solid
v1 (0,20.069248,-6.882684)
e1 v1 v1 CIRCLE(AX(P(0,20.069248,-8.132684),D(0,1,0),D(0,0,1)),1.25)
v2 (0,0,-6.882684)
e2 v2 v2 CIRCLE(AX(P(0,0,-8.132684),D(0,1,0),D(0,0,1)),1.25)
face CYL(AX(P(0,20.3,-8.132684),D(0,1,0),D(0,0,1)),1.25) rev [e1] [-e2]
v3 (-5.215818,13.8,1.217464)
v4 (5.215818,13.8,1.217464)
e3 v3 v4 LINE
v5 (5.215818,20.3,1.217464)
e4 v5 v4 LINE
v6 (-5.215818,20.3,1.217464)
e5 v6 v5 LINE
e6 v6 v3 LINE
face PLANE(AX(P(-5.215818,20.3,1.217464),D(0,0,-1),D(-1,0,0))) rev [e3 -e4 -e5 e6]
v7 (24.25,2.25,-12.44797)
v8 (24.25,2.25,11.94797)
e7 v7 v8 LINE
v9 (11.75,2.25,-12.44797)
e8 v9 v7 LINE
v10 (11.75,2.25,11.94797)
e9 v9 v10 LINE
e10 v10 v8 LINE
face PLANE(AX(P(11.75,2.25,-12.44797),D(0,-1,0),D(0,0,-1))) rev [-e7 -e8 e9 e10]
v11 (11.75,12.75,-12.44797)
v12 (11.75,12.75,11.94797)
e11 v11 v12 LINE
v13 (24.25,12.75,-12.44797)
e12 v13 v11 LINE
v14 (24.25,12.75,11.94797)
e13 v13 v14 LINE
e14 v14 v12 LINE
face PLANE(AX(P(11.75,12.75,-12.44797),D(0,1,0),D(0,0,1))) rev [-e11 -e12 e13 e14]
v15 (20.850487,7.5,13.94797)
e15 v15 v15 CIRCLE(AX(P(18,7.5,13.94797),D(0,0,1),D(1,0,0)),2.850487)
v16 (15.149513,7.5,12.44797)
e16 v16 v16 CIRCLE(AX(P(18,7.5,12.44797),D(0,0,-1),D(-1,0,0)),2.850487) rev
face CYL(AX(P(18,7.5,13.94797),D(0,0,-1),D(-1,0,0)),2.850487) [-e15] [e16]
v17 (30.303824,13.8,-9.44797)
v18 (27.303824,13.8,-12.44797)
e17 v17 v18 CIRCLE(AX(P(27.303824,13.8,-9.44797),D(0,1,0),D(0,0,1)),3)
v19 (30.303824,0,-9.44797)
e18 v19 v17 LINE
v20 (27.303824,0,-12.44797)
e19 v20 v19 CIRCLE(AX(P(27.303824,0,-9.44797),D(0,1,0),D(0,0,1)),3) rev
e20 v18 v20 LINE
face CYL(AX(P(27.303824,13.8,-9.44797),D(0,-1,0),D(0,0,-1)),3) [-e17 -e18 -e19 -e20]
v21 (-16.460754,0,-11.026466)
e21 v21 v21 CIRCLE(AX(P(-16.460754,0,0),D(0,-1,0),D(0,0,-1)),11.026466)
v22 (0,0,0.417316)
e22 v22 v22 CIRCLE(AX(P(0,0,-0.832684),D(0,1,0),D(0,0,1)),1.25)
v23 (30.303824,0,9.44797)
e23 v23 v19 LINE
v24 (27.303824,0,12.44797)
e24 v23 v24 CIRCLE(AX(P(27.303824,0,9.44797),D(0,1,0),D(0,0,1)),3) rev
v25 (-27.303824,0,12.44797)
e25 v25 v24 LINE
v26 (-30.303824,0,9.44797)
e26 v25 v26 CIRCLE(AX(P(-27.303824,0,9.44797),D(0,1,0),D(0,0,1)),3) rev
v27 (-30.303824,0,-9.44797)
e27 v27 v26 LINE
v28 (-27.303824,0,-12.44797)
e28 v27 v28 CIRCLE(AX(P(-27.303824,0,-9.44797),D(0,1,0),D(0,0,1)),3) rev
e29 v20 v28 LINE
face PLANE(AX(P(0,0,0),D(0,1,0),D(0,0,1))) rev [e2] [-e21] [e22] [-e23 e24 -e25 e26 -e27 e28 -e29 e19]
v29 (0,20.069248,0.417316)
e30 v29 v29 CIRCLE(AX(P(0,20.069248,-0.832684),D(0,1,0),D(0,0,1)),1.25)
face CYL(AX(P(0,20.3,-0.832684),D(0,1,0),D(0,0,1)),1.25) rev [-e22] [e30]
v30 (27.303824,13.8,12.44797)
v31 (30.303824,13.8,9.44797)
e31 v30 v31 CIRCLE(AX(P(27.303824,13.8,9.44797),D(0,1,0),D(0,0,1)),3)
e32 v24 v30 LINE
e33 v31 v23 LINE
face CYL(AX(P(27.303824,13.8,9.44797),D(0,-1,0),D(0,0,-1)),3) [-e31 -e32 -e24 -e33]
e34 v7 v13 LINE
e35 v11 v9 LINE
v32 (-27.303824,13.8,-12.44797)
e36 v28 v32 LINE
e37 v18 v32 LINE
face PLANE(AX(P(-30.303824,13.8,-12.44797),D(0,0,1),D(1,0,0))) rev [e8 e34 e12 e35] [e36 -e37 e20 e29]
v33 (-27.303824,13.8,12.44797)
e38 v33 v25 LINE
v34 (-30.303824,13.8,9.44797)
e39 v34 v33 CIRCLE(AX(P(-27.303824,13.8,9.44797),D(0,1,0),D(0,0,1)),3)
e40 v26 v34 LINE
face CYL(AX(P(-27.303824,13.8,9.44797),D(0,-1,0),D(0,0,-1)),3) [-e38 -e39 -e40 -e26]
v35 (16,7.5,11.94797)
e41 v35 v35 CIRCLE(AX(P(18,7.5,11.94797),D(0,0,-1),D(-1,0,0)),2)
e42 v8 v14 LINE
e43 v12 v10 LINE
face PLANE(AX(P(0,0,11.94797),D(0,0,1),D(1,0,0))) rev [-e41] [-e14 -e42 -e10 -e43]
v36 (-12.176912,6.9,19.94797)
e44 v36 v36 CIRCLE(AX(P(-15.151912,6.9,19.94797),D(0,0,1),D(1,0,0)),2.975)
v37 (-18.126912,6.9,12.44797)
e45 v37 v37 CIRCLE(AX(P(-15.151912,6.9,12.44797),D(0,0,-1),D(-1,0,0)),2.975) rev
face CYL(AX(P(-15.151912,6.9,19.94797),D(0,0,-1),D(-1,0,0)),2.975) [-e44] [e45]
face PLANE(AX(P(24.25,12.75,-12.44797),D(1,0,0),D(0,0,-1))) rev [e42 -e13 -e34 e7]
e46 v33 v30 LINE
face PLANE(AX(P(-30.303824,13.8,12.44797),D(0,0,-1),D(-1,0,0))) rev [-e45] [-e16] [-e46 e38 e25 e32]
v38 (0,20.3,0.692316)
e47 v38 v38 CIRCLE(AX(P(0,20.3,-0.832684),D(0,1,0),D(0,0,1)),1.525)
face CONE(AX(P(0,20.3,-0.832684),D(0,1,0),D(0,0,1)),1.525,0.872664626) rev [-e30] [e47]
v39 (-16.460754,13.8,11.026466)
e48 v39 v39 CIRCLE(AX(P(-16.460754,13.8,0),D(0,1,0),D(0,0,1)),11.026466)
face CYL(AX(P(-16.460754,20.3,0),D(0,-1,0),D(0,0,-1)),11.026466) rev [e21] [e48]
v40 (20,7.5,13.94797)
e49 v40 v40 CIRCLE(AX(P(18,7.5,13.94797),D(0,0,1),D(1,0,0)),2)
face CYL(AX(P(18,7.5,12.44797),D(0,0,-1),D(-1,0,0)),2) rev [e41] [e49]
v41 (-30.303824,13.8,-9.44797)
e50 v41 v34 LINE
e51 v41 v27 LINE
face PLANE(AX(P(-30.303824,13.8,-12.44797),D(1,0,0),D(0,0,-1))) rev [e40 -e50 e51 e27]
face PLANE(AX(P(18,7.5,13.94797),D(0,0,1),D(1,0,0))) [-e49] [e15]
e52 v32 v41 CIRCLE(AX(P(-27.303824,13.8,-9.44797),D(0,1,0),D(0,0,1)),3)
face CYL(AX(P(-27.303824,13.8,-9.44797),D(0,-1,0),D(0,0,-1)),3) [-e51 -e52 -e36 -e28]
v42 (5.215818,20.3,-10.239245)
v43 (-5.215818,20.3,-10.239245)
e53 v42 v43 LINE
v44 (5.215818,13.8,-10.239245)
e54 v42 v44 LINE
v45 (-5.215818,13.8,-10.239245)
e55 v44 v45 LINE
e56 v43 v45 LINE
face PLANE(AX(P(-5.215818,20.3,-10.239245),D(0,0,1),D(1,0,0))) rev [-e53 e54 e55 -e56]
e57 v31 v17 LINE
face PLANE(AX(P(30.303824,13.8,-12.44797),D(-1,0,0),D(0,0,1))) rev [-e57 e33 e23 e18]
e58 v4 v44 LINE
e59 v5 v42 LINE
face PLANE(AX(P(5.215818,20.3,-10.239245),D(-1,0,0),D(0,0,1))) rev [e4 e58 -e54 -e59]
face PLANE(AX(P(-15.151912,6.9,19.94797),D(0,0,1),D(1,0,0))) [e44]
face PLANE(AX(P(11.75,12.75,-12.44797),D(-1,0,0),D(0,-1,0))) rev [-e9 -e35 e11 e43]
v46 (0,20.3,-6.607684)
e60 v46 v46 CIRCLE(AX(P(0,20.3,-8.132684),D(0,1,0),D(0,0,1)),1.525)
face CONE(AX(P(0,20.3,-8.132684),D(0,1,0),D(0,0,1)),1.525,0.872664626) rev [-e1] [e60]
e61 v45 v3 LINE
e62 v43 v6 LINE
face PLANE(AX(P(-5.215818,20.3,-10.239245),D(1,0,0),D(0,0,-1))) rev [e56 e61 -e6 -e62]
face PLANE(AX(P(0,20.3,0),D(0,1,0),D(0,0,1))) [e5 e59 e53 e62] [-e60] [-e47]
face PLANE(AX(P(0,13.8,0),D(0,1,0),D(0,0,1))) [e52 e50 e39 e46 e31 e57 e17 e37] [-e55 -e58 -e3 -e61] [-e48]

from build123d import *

# Parameters (mm, degrees)
SKETCH_1_W          = 60.60764715
SKETCH_1_H          = 24.895940982
EXTRUDE_1_DEPTH     = 13.8
SKETCH_2_W          = 12.5
SKETCH_2_H          = 10.5
CUT_EXTRUDE_1_DEPTH = 42.576070048
SKETCH_3_W          = 12.5
SKETCH_3_H          = 10.5
EXTRUDE_2_DEPTH     = 0.5
SKETCH_4_R          = 2
CUT_EXTRUDE_2_DEPTH = 42.278610196
SKETCH_5_R          = 2.975
EXTRUDE_3_DEPTH     = 7.5
SKETCH_10_W         = 10.431635196
SKETCH_10_H         = 11.456709174
EXTRUDE_4_DEPTH     = 6.5
SKETCH_14_R         = 2.850486714
SKETCH_14_R_2       = 2
EXTRUDE_5_DEPTH     = 1.5
SKETCH_22_R         = 11.026465904
CUT_EXTRUDE_5_DEPTH = 42.573227563
FILLET_1_R          = 3
FILLET_2_R          = 3
FILLET_3_R          = 3
FILLET_4_R          = 3


# Read off the part's stored shape, not the designer's step: M3 螺紋孔3
with BuildPart() as part:
    # 草圖1 → 填料-伸長1 (new body)
    with BuildSketch(Plane(origin=(0, 0, 0), x_dir=(1, 0, 0), z_dir=(0, 1, 0))):
        Rectangle(SKETCH_1_W, SKETCH_1_H)
    extrude(amount=EXTRUDE_1_DEPTH)

    # 草圖2 → 除料-伸長1 (cut, through all)
    with BuildSketch(Plane.XY.offset(12.447970491)):
        with Locations((18, 7.5)):
            Rectangle(SKETCH_2_W, SKETCH_2_H)
    extrude(amount=-CUT_EXTRUDE_1_DEPTH, mode=Mode.SUBTRACT)

    # 草圖3 → 填料-伸長2 (add)
    with BuildSketch(Plane.XY.offset(12.447970491)):
        with Locations((18, 7.5)):
            Rectangle(SKETCH_3_W, SKETCH_3_H)
    extrude(amount=-EXTRUDE_2_DEPTH)

    # 草圖4 → 除料-伸長2 (cut, through all)
    with BuildSketch(Plane(origin=(0, 0, 11.947970491), x_dir=(-1, 0, 0), z_dir=(0, 0, -1))):
        with Locations((-18, 7.5)):
            Circle(SKETCH_4_R)
    extrude(amount=-CUT_EXTRUDE_2_DEPTH, mode=Mode.SUBTRACT)

    # 草圖5 → 填料-伸長3 (add)
    with BuildSketch(Plane.XY.offset(12.447970491)):
        with Locations(Location((-15.151911787, 6.9, 0), (0, 0, 180))):
            Circle(SKETCH_5_R)
    extrude(amount=EXTRUDE_3_DEPTH)

    # 草圖10 → 填料-伸長4 (add)
    with BuildSketch(Plane(origin=(0, 13.8, 0), x_dir=(1, 0, 0), z_dir=(0, 1, 0))):
        with Locations((0, 4.510890299)):
            Rectangle(SKETCH_10_W, SKETCH_10_H)
    extrude(amount=EXTRUDE_4_DEPTH)

    # M3 螺紋孔3 outline → M3 螺紋孔3 (revolve, cut)
    with BuildSketch(Plane.XY.offset(-8.13268367)):
        Polygon((0, 0), (1.25, 0), (1.25, 20.069247601), (1.525, 20.3), (0, 20.3), align=None)
    revolve(axis=Axis((0, 0, -8.13268367), (0, 1, 0)), mode=Mode.SUBTRACT)

    # Hole Wizard M3 _3 2 outline → Hole Wizard M3 _3 2 (revolve, cut)
    with BuildSketch(Plane.XY.offset(-0.83268367)):
        Polygon((0, 0), (1.25, 0), (1.25, 20.069247601), (1.525, 20.3), (0, 20.3), align=None)
    revolve(axis=Axis((0, 0, -0.83268367), (0, 1, 0)), mode=Mode.SUBTRACT)

    # 草圖14 → 填料-伸長5 (add)
    with BuildSketch(Plane.XY.offset(12.447970491)):
        with Locations(Location((18, 7.5, 0), (0, 0, 180))):
            Circle(SKETCH_14_R)
        with Locations(Location((18, 7.5, 0), (0, 0, 180))):
            Circle(SKETCH_14_R_2, mode=Mode.SUBTRACT)
    extrude(amount=EXTRUDE_5_DEPTH)

    # 草圖22 → 除料-伸長5 (cut, through all)
    with BuildSketch(Plane.XZ):
        with Locations(Location((-16.460754219, 0, 0), (0, 0, 270))):
            Circle(SKETCH_22_R)
    extrude(amount=-CUT_EXTRUDE_5_DEPTH, mode=Mode.SUBTRACT)

    # 圓角1
    fillet_1_edges = [part.edges().sort_by_distance(p)[0] for p in [
        (-30.303823575, 6.9, -12.447970491),
    ]]
    fillet(fillet_1_edges, radius=FILLET_1_R)

    # 圓角2
    fillet_2_edges = [part.edges().sort_by_distance(p)[0] for p in [
        (-30.303823575, 6.9, 12.447970491),
    ]]
    fillet(fillet_2_edges, radius=FILLET_2_R)

    # 圓角3
    fillet_3_edges = [part.edges().sort_by_distance(p)[0] for p in [
        (30.303823575, 6.9, -12.447970491),
    ]]
    fillet(fillet_3_edges, radius=FILLET_3_R)

    # 圓角4
    fillet_4_edges = [part.edges().sort_by_distance(p)[0] for p in [
        (30.303823575, 6.9, 12.447970491),
    ]]
    fillet(fillet_4_edges, radius=FILLET_4_R)


solid = part.part
